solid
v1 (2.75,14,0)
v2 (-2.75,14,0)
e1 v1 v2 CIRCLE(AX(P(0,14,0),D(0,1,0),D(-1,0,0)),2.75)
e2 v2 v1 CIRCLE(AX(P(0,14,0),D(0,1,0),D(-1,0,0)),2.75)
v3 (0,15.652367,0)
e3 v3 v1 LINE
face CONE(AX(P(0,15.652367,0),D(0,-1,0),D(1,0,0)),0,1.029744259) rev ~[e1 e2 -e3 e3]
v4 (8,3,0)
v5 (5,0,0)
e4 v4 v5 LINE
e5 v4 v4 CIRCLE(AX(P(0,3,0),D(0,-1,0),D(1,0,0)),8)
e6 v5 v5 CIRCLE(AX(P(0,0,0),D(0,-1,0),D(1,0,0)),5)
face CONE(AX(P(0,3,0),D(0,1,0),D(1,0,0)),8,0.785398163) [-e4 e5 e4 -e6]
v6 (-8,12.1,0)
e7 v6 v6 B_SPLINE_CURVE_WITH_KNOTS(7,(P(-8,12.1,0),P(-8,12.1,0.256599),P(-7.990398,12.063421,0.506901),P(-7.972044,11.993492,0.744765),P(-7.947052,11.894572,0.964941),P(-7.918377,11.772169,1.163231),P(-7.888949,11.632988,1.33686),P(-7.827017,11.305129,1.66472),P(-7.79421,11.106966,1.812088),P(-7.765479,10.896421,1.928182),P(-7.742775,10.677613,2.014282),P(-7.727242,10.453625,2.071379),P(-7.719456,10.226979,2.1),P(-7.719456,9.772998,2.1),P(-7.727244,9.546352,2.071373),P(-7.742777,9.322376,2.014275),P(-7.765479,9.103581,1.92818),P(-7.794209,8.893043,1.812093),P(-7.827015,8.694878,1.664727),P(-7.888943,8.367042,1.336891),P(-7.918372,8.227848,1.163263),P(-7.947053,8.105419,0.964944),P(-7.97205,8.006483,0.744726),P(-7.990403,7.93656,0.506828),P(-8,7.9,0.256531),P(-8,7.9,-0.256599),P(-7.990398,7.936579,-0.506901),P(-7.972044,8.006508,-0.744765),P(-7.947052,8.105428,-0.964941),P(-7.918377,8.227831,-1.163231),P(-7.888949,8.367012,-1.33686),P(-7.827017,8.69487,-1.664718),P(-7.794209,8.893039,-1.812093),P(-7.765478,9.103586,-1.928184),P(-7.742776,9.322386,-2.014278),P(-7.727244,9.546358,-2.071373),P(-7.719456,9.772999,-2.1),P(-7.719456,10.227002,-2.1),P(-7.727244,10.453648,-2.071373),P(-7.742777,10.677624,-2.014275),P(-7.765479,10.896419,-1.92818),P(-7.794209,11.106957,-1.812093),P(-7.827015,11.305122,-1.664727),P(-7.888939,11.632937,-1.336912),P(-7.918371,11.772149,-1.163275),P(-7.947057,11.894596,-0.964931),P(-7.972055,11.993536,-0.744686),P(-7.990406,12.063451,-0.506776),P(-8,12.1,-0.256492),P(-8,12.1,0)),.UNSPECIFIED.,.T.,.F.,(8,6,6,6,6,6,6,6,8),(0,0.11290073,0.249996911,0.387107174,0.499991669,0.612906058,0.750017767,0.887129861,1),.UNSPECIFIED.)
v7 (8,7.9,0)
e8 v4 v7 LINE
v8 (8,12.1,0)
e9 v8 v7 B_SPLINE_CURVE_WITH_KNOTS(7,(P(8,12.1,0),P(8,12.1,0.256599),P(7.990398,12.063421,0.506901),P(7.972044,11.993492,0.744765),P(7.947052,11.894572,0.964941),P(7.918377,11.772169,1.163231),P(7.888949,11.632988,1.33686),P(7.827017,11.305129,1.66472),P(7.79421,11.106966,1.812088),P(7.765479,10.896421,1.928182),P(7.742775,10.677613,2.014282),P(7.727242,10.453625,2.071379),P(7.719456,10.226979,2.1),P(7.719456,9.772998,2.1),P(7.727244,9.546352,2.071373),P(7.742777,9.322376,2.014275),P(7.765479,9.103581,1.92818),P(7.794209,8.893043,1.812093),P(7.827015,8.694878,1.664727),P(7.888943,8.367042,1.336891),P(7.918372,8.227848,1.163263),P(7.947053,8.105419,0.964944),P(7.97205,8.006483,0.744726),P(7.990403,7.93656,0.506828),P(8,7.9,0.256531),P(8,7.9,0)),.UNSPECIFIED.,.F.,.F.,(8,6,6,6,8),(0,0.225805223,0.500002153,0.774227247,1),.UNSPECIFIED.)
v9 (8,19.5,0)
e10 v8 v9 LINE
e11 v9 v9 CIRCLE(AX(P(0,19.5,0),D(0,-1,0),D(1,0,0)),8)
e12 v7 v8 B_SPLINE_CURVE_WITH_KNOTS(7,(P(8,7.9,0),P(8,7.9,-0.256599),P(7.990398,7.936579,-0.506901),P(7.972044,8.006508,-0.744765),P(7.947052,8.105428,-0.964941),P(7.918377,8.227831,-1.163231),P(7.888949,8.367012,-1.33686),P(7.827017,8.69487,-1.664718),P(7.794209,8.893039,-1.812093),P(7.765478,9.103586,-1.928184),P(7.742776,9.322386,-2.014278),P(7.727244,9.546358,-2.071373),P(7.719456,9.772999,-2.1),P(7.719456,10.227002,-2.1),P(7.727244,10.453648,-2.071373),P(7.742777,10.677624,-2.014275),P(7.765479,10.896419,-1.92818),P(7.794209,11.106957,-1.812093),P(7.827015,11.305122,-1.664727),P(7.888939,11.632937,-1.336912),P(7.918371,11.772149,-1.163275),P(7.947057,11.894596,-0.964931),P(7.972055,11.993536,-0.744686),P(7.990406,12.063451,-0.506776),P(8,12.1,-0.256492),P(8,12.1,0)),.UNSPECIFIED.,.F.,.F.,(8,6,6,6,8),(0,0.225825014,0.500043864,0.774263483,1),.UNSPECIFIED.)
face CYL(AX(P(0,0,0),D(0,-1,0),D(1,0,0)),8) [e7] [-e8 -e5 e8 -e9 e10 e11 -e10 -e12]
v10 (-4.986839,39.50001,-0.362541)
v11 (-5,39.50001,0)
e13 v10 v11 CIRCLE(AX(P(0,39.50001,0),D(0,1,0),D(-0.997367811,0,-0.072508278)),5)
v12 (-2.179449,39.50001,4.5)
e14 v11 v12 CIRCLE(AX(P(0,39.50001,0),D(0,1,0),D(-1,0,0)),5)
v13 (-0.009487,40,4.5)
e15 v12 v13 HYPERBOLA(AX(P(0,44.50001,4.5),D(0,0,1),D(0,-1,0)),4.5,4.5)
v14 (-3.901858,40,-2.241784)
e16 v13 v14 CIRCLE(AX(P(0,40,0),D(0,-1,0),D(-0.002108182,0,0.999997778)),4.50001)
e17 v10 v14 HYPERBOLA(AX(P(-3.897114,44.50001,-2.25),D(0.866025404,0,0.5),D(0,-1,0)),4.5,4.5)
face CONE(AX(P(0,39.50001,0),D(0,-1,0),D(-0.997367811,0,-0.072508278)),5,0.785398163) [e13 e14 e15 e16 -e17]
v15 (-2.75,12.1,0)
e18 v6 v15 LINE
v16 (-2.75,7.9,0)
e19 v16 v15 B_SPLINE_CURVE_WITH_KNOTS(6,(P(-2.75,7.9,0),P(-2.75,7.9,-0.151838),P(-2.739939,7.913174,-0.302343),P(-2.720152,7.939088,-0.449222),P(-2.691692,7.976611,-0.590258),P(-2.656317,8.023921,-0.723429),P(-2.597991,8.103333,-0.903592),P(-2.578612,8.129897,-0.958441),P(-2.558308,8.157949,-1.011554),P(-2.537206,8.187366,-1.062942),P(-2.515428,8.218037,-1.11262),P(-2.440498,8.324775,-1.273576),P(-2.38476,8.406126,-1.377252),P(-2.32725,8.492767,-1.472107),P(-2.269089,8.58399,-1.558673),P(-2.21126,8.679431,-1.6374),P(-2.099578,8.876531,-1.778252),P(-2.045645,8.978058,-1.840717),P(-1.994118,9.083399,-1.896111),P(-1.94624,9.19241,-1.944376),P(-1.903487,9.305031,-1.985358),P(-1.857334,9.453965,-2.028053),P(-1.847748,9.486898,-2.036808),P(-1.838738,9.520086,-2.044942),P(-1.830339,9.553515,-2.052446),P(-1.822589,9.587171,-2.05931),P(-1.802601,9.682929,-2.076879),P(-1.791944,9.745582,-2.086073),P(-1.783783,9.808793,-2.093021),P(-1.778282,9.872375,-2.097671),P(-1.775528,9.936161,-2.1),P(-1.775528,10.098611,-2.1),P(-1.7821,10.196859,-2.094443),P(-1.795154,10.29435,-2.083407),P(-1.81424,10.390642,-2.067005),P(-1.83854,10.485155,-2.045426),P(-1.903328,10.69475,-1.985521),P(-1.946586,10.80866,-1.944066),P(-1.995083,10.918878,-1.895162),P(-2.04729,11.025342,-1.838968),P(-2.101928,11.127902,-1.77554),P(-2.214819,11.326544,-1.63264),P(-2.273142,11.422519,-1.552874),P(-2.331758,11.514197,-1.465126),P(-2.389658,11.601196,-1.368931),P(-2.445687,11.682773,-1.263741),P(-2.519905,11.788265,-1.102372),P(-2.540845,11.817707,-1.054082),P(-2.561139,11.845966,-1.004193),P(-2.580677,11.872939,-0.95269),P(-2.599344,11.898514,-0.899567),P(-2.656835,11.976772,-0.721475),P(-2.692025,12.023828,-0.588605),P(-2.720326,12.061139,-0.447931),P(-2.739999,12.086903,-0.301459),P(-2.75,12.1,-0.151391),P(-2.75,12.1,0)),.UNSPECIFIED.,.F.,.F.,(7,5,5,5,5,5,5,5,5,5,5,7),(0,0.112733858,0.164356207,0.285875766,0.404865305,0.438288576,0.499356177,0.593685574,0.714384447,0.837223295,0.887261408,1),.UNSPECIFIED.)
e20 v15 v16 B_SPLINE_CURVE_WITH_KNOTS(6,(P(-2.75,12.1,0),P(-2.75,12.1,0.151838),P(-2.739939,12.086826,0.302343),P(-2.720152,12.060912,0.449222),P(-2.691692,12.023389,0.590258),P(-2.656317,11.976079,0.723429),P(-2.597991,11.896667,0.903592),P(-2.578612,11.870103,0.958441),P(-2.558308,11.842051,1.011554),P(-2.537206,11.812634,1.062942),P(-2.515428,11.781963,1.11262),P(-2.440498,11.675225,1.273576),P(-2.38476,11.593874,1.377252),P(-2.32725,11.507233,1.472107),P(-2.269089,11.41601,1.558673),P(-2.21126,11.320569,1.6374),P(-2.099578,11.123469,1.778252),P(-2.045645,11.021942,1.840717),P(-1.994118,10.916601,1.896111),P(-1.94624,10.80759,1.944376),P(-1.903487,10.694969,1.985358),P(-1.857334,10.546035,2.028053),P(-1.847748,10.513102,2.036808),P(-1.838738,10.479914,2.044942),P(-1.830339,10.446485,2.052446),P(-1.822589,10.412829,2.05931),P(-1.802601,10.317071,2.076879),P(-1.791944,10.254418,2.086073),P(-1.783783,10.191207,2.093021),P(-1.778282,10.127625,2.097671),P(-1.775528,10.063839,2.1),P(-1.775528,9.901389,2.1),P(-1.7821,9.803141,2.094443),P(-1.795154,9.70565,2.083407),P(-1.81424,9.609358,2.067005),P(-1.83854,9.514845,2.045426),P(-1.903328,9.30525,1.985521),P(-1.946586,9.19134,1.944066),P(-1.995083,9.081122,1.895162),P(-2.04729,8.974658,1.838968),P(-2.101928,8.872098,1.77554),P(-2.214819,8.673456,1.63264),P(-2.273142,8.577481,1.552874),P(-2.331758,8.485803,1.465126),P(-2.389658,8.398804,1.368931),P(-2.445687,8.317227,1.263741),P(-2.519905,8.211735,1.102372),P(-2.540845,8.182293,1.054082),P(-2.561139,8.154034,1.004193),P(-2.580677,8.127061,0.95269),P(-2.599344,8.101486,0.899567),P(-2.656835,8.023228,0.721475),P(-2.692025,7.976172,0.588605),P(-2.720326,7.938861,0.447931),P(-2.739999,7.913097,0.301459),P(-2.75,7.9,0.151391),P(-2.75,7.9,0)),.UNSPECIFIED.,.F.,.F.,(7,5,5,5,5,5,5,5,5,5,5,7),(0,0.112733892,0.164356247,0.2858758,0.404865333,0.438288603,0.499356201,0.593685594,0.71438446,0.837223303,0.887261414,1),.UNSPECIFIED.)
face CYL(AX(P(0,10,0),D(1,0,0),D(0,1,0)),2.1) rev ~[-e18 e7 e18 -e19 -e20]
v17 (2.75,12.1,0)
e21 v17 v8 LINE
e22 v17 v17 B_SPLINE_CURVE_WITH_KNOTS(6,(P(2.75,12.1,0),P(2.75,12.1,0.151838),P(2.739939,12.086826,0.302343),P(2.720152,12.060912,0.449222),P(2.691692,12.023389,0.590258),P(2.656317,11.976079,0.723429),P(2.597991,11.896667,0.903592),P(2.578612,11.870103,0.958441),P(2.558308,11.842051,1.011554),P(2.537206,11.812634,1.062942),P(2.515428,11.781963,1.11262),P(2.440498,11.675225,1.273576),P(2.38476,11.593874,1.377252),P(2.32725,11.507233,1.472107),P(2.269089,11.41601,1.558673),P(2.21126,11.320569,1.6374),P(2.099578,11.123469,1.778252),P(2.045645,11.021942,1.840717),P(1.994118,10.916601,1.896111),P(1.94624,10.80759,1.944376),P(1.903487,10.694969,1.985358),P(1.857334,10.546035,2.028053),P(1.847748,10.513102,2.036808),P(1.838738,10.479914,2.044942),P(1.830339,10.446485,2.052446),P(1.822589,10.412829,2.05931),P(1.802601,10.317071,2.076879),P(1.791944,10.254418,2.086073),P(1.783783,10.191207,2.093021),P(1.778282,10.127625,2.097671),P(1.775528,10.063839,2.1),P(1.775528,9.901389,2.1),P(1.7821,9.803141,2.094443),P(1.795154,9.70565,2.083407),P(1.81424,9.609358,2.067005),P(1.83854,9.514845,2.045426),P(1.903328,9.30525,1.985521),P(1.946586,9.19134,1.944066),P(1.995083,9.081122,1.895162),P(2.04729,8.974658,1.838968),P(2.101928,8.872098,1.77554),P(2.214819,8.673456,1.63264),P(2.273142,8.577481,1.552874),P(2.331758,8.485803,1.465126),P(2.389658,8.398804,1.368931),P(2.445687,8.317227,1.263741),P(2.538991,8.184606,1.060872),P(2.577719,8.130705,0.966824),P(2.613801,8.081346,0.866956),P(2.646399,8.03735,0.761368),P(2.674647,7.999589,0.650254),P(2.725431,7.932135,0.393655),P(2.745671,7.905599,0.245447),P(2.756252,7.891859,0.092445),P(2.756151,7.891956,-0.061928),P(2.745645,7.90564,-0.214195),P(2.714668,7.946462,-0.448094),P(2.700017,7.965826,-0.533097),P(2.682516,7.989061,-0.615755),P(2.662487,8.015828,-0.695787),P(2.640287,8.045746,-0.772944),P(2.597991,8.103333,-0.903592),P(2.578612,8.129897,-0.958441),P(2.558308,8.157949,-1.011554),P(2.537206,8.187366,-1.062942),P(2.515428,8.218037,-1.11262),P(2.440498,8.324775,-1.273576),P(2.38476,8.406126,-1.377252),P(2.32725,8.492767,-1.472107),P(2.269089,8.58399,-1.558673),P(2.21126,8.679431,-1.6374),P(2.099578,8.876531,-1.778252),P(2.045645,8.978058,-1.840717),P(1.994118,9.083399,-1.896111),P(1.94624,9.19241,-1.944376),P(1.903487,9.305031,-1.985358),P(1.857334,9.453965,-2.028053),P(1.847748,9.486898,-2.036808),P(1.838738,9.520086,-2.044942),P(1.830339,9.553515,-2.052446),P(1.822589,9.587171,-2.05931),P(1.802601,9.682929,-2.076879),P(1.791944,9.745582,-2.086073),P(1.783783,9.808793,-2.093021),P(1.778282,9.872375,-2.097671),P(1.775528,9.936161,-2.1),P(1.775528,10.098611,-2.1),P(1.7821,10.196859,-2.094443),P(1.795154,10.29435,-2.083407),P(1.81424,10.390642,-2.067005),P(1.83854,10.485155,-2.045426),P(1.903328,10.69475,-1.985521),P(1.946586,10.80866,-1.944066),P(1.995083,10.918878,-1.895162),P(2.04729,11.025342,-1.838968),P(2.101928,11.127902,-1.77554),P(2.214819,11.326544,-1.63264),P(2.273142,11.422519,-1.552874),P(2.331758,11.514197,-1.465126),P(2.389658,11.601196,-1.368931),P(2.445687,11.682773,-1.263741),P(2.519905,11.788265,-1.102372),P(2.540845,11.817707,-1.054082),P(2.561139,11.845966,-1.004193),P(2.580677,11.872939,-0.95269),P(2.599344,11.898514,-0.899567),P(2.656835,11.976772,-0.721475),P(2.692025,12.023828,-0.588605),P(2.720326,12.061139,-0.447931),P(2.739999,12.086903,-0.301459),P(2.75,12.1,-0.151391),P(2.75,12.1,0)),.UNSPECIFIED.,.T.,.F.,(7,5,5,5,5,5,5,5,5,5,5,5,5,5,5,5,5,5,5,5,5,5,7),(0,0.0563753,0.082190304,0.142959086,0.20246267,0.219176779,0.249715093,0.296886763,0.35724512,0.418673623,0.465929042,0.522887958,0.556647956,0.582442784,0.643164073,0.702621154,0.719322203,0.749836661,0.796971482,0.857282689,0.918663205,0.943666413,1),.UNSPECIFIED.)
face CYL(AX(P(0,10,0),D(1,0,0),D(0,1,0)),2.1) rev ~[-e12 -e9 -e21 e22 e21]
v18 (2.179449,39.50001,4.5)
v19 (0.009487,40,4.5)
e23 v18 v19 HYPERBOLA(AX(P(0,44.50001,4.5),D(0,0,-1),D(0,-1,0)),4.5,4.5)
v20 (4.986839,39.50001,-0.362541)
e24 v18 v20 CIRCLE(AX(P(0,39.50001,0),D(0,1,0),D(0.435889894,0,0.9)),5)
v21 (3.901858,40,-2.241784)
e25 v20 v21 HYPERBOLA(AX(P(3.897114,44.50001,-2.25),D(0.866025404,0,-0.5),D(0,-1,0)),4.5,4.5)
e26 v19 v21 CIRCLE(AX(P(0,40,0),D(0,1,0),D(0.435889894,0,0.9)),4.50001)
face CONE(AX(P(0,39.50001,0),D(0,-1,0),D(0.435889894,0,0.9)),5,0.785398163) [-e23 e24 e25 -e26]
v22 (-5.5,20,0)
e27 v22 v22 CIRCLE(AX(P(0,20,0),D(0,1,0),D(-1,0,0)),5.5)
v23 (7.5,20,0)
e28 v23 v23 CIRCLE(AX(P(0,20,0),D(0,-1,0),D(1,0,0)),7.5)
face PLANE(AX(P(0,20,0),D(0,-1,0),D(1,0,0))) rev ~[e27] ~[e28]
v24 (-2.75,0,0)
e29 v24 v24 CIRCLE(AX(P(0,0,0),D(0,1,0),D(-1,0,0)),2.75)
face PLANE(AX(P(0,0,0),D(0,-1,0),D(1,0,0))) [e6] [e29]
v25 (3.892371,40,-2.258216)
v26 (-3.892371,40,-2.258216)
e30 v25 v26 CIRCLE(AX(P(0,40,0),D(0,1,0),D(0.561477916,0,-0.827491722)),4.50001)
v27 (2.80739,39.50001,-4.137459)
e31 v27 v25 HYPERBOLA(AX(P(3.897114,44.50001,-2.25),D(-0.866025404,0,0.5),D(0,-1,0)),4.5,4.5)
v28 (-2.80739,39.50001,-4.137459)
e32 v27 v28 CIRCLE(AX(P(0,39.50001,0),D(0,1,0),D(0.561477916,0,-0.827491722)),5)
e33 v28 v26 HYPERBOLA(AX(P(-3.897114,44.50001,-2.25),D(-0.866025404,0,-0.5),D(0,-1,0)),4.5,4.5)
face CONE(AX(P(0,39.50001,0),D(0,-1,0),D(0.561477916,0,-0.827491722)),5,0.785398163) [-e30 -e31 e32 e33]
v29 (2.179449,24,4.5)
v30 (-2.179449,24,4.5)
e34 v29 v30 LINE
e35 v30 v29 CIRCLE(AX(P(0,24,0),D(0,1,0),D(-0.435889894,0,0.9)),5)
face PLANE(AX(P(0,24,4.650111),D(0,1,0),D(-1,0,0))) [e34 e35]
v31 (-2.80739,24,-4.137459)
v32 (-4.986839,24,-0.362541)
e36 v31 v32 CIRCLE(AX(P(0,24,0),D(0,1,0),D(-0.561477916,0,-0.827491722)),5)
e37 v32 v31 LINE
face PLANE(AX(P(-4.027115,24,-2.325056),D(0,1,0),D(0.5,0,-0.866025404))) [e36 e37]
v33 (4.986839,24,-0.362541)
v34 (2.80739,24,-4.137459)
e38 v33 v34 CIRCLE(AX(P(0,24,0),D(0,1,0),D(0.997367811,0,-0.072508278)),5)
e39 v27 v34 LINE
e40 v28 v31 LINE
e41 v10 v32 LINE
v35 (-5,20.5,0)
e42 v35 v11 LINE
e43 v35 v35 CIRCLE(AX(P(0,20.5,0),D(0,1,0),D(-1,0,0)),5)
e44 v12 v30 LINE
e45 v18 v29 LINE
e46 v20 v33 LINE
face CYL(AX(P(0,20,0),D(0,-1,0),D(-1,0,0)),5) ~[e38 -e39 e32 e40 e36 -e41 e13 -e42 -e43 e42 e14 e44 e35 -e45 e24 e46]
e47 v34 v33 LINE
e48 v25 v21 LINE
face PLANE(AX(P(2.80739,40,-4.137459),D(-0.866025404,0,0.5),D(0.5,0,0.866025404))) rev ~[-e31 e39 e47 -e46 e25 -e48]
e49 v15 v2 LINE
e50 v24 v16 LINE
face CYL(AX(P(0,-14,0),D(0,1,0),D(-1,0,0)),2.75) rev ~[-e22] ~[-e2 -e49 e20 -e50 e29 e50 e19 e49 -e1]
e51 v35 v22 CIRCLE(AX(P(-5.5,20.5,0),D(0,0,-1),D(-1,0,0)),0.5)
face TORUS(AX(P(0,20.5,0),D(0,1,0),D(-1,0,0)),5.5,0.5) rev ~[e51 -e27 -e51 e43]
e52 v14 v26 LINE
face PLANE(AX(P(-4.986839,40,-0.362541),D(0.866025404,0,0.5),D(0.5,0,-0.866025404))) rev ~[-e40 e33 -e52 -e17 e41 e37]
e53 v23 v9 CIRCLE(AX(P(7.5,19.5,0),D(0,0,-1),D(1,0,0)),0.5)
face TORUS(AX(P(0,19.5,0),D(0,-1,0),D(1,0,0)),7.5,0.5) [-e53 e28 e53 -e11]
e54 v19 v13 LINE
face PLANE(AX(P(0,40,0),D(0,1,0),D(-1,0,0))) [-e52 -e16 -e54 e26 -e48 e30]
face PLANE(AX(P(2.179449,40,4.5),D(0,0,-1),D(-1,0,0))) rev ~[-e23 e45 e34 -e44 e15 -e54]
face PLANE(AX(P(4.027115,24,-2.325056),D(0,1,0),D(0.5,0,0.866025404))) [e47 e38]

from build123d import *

# Parameters (mm, degrees)
F0_R            = 8
F1_DEPTH        = 20
F2_R            = 5
F3_DEPTH        = 20
F5_DEPTH        = 16
F5_COPIES_COUNT = 3
F6_SIZE         = 0.49999
F7_R            = 0.5
F9_D            = 5.5
F9_DEPTH        = 14
F9_TIP          = 1.6523667023
F10_R           = 2.1
F11_DEPTH       = 8.25
F12_SIZE        = 3


# Not quite as in the source:
# - a fillet or chamfer is up to 0.001 mm smaller than in the source, because OpenCascade refuses the exact size
# - a pattern or mirror of a feature is missing from the dataset's text; its kind, count and spacing are read off the source's solid


with BuildPart() as f1:
    # F0 (on Front) → F1 (new body)
    with BuildSketch(Plane.XZ):
        Circle(F0_R)
    extrude(amount=-F1_DEPTH)

    # F2 (on face) → F3 (join)
    with BuildSketch(Plane(origin=(0, 20, 0), x_dir=(-1, 0, 0), z_dir=(0, 1, 0))):
        Circle(F2_R)
    extrude(amount=F3_DEPTH)

    # F4 (on face) → F5 (cut)
    with BuildSketch(Plane(origin=(0, 40, 0), x_dir=(-1, 0, 0), z_dir=(0, 1, 0))):
        with BuildLine():
            ThreePointArc((2.1794494718, 4.5), (0, 5), (-2.1794494718, 4.5))
            Line((-2.1794494718, 4.5), (2.1794494718, 4.5))
        make_face()
    f5 = extrude(amount=-F5_DEPTH, mode=Mode.SUBTRACT)

    # F5_copies: F5 ×3 about axis
    f5_copies_axis = Axis((0, 0, 0), (0, 1, 0))
    for i in range(1, F5_COPIES_COUNT):
        add(f5.rotate(f5_copies_axis, i * 360 / F5_COPIES_COUNT), mode=Mode.SUBTRACT)

    # F6 (size 0.5 in the source; OpenCascade refuses exactly that, so slightly less here)
    f6_edges = [f1.edges().sort_by_distance(p)[0] for p in [
        (4.330127, 40, 2.5),
        (-4.996709, 40, -0.18139),
        (0, 40, -5),
        (-4.236582, 40, 2.655443),
    ]]
    chamfer(f6_edges, length=F6_SIZE)

    # F7
    f7_edges = [f1.edges().sort_by_distance(p)[0] for p in [
        (-8, 20, 0),
        (5, 20, 0),
    ]]
    fillet(f7_edges, radius=F7_R)

    # F9
    with Locations(Plane.XZ):
        with Locations((0, 0)):
            Hole(F9_D / 2, depth=F9_DEPTH)
            with Locations((0, 0, -(F9_DEPTH + F9_TIP / 2))):  # 118° drill point
                Cone(0, F9_D / 2, F9_TIP, mode=Mode.SUBTRACT)

    # F10 (on Right) → F11 (cut, symmetric)
    with BuildSketch(Plane.YZ):
        with Locations((10, 0)):
            Circle(F10_R)
    extrude(amount=F11_DEPTH, both=True, mode=Mode.SUBTRACT)

    # F12
    f12_edges = [f1.edges().sort_by_distance(p)[0] for p in [
        (-8, 0, 0),
    ]]
    chamfer(f12_edges, length=F12_SIZE)


solid = f1.part
